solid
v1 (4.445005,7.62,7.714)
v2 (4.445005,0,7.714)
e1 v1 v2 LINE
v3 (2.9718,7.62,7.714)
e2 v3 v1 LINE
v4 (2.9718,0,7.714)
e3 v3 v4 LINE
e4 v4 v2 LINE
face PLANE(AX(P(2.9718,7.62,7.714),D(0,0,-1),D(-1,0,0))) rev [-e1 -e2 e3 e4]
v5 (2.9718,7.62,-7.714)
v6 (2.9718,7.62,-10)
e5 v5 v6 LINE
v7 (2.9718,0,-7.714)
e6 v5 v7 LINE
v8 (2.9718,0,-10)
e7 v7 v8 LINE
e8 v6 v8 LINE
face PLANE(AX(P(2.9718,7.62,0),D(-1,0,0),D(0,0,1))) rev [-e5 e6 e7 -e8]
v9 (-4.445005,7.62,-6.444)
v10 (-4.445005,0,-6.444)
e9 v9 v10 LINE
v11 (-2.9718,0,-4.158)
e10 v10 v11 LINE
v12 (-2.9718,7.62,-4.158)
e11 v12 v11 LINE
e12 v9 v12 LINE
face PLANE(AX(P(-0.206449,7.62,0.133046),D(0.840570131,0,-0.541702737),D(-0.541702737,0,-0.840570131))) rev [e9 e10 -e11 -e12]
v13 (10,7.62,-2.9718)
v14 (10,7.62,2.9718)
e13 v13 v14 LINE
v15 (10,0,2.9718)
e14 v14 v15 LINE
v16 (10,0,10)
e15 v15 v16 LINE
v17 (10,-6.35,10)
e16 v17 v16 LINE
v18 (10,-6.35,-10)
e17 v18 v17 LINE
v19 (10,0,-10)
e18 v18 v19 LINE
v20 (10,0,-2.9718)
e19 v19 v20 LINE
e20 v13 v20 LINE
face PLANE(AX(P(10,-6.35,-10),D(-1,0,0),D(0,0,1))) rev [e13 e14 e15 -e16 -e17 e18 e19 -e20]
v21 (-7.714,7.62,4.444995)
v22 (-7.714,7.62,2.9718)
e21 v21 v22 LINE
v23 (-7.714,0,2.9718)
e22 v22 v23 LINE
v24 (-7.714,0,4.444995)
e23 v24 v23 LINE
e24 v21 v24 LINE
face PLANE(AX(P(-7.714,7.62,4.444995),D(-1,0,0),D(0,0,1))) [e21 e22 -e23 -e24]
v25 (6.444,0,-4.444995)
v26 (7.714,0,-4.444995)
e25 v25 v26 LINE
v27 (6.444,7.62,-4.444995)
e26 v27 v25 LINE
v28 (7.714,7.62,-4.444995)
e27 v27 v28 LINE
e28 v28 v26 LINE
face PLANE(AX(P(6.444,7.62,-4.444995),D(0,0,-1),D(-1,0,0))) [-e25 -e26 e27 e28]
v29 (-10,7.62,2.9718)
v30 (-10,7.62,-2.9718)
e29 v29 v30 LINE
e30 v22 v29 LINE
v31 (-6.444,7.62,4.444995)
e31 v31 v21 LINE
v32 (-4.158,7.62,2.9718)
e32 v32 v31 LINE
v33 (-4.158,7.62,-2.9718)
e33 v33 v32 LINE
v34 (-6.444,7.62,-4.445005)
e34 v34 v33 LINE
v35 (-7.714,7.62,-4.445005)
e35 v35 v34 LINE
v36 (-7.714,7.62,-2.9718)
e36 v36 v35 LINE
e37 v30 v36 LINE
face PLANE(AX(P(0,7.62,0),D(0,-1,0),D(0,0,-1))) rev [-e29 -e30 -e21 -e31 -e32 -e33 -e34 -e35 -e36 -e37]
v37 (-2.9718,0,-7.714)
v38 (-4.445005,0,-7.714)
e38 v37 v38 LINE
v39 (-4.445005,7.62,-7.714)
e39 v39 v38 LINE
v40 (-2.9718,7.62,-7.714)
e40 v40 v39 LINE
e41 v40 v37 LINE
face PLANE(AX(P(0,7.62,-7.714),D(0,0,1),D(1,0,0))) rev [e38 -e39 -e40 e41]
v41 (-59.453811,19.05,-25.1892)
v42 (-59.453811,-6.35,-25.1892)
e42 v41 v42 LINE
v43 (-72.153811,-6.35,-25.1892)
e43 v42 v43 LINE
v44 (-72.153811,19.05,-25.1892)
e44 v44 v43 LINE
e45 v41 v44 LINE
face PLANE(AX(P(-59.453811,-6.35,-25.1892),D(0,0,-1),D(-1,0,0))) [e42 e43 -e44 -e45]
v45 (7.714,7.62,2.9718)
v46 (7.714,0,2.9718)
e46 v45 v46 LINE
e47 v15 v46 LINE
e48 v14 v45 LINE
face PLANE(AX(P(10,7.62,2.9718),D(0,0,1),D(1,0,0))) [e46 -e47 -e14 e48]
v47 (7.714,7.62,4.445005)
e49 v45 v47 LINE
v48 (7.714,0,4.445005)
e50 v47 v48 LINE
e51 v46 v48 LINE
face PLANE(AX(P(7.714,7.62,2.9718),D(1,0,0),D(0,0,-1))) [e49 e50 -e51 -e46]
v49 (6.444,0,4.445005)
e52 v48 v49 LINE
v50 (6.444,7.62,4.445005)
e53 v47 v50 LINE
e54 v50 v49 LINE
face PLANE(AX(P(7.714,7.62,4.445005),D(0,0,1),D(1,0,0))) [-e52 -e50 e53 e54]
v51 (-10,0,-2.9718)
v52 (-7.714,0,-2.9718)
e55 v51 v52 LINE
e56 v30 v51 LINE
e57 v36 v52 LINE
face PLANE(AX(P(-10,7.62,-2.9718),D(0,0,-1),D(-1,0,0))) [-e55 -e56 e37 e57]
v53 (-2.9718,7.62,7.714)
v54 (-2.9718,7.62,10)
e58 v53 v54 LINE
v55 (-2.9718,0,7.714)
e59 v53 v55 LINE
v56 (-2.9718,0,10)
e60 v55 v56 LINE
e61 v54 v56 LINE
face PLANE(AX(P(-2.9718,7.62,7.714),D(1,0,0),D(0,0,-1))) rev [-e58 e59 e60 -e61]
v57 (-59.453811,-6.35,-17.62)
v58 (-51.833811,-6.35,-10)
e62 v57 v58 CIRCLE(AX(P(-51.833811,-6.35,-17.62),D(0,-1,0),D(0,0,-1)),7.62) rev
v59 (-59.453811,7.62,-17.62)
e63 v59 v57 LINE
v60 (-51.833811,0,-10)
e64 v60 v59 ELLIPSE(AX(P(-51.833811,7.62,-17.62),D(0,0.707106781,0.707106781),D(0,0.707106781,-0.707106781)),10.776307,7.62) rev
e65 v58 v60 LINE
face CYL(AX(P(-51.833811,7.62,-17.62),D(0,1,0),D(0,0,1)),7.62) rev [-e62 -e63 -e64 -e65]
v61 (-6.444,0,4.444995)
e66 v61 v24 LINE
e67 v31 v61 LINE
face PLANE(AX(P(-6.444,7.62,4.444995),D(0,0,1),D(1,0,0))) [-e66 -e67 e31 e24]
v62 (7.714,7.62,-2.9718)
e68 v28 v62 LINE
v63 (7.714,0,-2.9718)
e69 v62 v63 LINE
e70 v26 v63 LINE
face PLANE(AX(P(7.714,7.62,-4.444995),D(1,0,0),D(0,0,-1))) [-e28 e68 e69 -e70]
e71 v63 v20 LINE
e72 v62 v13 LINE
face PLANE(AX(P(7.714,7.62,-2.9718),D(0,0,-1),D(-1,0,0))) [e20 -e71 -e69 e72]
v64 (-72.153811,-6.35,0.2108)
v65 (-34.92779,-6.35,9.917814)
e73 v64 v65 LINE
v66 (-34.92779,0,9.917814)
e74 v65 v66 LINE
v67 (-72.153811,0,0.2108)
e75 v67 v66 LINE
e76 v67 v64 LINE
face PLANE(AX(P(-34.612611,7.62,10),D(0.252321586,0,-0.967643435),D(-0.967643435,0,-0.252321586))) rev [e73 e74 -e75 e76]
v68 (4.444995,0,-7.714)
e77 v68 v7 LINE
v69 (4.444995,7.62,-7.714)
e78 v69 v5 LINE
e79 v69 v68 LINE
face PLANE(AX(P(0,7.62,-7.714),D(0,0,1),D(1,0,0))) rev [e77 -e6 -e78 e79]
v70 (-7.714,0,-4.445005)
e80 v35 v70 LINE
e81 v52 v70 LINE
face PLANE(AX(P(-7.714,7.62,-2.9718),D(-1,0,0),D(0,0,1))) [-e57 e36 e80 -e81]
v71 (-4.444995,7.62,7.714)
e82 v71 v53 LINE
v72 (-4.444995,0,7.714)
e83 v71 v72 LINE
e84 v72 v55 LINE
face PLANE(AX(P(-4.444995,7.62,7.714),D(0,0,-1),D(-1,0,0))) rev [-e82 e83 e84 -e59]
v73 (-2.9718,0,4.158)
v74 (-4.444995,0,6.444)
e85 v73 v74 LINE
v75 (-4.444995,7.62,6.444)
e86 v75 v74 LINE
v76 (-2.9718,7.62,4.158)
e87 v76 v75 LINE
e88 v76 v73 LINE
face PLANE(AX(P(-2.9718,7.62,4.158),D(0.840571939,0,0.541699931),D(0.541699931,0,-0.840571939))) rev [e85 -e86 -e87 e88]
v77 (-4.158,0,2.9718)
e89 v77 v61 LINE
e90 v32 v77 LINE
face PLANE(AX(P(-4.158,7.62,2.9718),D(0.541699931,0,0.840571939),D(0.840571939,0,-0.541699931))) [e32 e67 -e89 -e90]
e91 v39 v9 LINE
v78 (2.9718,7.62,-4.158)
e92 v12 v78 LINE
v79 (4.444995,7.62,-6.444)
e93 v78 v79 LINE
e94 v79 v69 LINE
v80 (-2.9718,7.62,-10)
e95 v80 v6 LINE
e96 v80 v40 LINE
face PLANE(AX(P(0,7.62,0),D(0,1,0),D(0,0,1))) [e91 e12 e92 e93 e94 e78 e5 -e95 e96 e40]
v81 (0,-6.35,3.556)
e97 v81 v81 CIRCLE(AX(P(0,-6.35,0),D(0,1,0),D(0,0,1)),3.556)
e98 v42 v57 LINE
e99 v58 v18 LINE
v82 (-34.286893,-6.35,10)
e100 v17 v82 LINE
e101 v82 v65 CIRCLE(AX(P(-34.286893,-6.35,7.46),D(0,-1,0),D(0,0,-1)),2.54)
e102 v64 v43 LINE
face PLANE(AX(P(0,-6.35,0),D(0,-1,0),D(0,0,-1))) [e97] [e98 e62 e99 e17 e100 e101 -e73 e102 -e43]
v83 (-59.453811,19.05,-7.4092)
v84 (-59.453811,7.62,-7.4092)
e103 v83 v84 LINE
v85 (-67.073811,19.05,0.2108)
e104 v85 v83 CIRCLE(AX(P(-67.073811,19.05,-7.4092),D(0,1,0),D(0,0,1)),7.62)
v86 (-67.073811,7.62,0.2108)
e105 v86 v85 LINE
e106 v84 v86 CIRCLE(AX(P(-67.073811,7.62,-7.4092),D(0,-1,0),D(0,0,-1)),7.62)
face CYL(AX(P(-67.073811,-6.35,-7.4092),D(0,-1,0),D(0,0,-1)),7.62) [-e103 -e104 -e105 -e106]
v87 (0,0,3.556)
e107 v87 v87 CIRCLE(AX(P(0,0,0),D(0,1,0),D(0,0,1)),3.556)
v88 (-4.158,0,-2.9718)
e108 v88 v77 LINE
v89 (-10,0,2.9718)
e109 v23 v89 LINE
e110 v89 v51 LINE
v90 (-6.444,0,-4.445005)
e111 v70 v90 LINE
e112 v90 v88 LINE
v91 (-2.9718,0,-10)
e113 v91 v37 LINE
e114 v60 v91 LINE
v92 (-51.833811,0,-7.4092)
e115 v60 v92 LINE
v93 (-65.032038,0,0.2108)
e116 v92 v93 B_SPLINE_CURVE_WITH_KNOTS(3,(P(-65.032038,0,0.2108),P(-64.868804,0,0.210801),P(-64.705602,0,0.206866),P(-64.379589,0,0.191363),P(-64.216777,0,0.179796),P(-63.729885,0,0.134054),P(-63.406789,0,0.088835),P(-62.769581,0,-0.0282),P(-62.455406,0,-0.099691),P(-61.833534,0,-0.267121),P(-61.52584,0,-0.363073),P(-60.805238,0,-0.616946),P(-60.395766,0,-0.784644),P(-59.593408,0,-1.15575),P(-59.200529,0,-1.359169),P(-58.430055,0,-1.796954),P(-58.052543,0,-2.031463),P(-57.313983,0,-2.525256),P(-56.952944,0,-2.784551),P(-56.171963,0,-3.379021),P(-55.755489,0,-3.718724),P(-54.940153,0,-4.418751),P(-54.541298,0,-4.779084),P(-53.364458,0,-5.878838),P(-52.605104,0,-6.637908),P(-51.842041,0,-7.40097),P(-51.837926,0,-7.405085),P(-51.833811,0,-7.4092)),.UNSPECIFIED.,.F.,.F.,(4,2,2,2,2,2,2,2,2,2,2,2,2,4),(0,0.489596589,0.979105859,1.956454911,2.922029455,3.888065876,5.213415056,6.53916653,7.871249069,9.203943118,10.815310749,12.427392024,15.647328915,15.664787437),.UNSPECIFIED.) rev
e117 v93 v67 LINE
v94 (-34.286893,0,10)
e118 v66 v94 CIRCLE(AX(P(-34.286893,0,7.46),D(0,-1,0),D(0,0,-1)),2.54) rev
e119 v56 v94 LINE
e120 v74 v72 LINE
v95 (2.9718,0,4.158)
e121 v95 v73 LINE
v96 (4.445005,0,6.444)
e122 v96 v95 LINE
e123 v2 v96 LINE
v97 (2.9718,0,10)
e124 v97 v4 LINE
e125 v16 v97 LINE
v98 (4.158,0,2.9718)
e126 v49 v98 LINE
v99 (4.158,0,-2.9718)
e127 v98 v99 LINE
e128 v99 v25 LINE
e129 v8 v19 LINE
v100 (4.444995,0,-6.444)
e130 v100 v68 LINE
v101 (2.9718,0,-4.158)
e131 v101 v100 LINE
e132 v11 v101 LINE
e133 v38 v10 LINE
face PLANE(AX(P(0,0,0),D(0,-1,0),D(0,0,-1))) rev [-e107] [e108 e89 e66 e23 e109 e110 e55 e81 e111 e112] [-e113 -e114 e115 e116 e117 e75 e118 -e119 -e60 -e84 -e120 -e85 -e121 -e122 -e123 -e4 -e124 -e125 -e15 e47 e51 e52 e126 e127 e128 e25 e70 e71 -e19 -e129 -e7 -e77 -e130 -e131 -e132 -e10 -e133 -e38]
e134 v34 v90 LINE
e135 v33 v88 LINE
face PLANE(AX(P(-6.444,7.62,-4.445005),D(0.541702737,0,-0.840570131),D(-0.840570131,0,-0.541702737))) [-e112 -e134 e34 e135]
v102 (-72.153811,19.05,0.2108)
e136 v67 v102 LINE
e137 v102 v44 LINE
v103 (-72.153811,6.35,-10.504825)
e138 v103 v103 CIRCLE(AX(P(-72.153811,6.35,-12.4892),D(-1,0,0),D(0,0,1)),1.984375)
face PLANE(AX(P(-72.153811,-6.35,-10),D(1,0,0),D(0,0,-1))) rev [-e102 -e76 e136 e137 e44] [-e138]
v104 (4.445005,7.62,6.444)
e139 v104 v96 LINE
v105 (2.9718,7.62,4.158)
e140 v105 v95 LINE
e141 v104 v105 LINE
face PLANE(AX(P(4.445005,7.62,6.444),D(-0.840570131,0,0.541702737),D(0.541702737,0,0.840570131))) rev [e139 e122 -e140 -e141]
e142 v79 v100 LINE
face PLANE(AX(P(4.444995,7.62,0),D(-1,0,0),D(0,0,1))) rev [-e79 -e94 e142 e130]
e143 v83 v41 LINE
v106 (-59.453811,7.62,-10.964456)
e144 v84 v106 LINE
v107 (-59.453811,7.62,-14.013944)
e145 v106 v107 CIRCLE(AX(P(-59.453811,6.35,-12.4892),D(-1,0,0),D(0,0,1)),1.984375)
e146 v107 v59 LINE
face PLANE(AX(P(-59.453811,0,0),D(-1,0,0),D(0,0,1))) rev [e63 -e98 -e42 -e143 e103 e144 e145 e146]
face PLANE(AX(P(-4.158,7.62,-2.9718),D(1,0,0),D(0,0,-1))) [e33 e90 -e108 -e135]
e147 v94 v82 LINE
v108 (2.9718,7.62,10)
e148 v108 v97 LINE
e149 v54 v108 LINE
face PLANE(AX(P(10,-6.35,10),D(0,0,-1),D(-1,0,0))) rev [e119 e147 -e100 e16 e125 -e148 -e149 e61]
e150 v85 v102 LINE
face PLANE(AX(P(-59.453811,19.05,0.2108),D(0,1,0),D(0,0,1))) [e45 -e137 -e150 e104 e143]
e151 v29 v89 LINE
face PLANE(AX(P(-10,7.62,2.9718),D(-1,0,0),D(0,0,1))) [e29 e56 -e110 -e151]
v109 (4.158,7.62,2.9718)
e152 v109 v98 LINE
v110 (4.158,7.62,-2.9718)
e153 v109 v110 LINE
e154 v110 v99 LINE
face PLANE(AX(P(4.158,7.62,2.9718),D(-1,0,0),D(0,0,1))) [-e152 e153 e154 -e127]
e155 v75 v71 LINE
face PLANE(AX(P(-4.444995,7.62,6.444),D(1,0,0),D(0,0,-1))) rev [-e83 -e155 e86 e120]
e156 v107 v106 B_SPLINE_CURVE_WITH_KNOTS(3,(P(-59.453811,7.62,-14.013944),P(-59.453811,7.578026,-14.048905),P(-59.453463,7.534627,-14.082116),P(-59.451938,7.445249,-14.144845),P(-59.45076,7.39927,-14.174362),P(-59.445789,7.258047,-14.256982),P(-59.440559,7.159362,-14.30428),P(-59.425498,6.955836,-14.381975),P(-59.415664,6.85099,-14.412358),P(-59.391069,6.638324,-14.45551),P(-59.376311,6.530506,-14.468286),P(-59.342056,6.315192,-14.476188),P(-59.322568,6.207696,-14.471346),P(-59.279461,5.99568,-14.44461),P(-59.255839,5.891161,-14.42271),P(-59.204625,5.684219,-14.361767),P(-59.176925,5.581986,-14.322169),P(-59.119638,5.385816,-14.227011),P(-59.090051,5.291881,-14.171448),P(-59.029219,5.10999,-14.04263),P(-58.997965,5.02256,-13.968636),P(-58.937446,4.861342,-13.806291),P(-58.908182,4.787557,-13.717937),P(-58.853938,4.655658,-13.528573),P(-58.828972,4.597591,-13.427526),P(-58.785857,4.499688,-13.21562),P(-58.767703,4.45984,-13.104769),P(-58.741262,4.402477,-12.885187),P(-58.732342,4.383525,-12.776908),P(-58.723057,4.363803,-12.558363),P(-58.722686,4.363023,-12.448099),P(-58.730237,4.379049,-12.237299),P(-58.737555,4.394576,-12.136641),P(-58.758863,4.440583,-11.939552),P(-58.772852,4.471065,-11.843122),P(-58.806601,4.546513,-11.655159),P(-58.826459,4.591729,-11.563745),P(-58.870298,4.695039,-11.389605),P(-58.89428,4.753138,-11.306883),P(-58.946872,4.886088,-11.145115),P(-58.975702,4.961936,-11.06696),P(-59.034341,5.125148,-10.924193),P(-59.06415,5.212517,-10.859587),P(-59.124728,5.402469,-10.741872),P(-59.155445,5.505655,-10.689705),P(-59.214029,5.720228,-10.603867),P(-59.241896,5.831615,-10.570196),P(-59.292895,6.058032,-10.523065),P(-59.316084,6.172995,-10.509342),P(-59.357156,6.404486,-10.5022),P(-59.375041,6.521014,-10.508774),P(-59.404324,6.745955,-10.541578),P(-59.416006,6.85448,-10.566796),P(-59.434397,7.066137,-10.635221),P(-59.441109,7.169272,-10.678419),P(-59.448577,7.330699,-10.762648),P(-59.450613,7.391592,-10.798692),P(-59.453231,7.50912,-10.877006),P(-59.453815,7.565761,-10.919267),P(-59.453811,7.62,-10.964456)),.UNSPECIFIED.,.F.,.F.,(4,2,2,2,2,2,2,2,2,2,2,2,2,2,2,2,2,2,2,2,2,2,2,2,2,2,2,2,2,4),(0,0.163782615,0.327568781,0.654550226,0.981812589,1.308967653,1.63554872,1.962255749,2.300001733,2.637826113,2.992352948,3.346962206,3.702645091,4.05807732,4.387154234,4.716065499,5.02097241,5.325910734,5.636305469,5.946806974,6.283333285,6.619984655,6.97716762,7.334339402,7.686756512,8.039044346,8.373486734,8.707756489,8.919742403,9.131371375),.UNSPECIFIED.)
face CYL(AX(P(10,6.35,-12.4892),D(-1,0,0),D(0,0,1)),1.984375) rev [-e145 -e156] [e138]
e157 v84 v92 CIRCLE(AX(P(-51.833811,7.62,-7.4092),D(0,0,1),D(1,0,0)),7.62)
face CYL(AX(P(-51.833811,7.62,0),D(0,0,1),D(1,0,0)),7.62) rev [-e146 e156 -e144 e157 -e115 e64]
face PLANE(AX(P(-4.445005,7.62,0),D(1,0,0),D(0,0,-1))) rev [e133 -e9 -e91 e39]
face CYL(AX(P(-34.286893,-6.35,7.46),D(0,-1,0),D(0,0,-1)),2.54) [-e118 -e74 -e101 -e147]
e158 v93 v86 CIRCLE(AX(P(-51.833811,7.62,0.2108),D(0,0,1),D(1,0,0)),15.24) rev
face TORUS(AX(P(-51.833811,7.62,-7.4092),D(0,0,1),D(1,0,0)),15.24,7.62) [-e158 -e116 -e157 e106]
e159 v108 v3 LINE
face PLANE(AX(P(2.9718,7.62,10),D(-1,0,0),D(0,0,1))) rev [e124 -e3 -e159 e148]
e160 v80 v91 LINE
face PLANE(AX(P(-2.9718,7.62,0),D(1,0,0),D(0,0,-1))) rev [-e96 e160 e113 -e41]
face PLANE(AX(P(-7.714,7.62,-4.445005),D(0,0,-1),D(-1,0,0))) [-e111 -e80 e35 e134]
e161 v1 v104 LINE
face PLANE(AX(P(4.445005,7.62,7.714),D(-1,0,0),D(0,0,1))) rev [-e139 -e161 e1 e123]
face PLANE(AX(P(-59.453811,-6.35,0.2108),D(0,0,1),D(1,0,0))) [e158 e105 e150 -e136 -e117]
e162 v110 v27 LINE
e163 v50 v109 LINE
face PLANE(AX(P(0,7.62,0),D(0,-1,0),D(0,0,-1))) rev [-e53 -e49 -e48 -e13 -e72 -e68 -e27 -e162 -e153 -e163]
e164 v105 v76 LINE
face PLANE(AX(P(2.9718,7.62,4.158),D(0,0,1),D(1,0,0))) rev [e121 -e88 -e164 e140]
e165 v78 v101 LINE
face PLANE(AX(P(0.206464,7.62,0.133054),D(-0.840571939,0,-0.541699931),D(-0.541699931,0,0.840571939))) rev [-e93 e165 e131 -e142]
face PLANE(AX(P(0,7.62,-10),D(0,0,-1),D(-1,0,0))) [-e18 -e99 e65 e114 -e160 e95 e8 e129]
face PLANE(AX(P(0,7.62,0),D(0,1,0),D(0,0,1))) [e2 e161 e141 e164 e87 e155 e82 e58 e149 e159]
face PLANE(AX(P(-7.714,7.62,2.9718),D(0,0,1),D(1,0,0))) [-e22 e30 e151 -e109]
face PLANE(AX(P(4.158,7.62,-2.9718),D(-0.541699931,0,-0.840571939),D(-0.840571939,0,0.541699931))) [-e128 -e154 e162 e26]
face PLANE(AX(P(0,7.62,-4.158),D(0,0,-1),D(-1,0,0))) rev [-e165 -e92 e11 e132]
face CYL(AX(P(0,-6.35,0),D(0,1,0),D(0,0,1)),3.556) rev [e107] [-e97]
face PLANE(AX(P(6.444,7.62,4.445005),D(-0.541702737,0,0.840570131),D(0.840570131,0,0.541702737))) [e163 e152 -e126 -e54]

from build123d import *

# Parameters (mm, degrees)
BOSS_EXTRUDE1_DEPTH   = 7.62
BOSS_EXTRUDE1_2_DEPTH = 7.62
BOSS_EXTRUDE1_3_DEPTH = 7.62
BOSS_EXTRUDE1_4_DEPTH = 7.62
SKETCH2_W             = 82.1538108
SKETCH2_H             = 20
BOSS_EXTRUDE2_DEPTH   = 6.35
CUT_EXTRUDE1_DEPTH    = 75.17097352
FILLET1_R             = 2.54
SKETCH6_W             = 25.4
SKETCH6_H             = 25.4
BOSS_EXTRUDE7_DEPTH   = 12.7
FILLET3_R             = 7.62
FILLET5_R             = 7.62
SKETCH11_R            = 1.984375
CUT_EXTRUDE3_DEPTH    = 89.015038158
SKETCH12_R            = 3.556
CUT_EXTRUDE4_DEPTH    = 79.762749597


with BuildPart() as part:
    # Sketch1 → Boss-Extrude1 (new body)
    with BuildSketch(Plane(origin=(0, 0, 0), x_dir=(1, 0, 0), z_dir=(0, 1, 0))):
        Polygon((-2.9718, 10), (-2.9718, 7.714), (-4.4450054, 7.714), (-4.4450054, 6.444), (-2.9718, 4.158), (2.9718, 4.158), (4.4449946, 6.444), (4.4449946, 7.714), (2.9718, 7.714), (2.9718, 10), align=None)
    extrude(amount=BOSS_EXTRUDE1_DEPTH)



with BuildPart() as body_2:
    # Sketch1 → Boss-Extrude1 2 (new body)
    with BuildSketch(Plane(origin=(0, 0, 0), x_dir=(1, 0, 0), z_dir=(0, 1, 0))):
        Polygon((4.158, -2.9718), (4.158, 2.9718), (6.444, 4.4449946), (7.714, 4.4449946), (7.714, 2.9718), (10, 2.9718), (10, -2.9718), (7.714, -2.9718), (7.714, -4.4450054), (6.444, -4.4450054), align=None)
    extrude(amount=BOSS_EXTRUDE1_2_DEPTH)


with BuildPart() as body_3:
    # Sketch1 → Boss-Extrude1 3 (new body)
    with BuildSketch(Plane(origin=(0, 0, 0), x_dir=(1, 0, 0), z_dir=(0, 1, 0))):
        Polygon((4.4450054, -6.444), (2.9718, -4.158), (-2.9718, -4.158), (-4.4449946, -6.444), (-4.4449946, -7.714), (-2.9718, -7.714), (-2.9718, -10), (2.9718, -10), (2.9718, -7.714), (4.4450054, -7.714), align=None)
    extrude(amount=BOSS_EXTRUDE1_3_DEPTH)


with BuildPart() as body_4:
    # Sketch1 → Boss-Extrude1 4 (new body)
    with BuildSketch(Plane(origin=(0, 0, 0), x_dir=(1, 0, 0), z_dir=(0, 1, 0))):
        Polygon((-10, -2.9718), (-10, 2.9718), (-7.714, 2.9718), (-7.714, 4.4450054), (-6.444, 4.4450054), (-4.158, 2.9718), (-4.158, -2.9718), (-6.444, -4.4449946), (-7.714, -4.4449946), (-7.714, -2.9718), align=None)
    extrude(amount=BOSS_EXTRUDE1_4_DEPTH)


with BuildPart() as part_1:
    add(part.part)

    add(body_2.part)  # Boss-Extrude2 merges body 2

    add(body_3.part)  # Boss-Extrude2 merges body 3

    add(body_4.part)  # Boss-Extrude2 merges body 4
    # Sketch2 → Boss-Extrude2 (add)
    with BuildSketch(Plane.XZ):
        with Locations((-31.0769054, 0)):
            Rectangle(SKETCH2_W, SKETCH2_H)
    extrude(amount=BOSS_EXTRUDE2_DEPTH)

    # Sketch4 → Cut-Extrude1 (cut, through all)
    with BuildSketch(Plane(origin=(0, -6.35, 0), x_dir=(-1, 0, 0), z_dir=(0, -1, 0))):
        Polygon((72.1538108, -10), (34.6126108, -10), (72.1538108, -0.2108), align=None)
    extrude(amount=-CUT_EXTRUDE1_DEPTH, mode=Mode.SUBTRACT)

    # Fillet1
    fillet1_edges = [part_1.edges().sort_by_distance(p)[0] for p in [
        (-34.6126108, -3.175, 10),
    ]]
    fillet(fillet1_edges, radius=FILLET1_R)

    # Sketch6 → Boss-Extrude7 (add)
    with BuildSketch(Plane.ZY.offset(72.1538108)):
        with Locations((-12.4892, 6.35)):
            Rectangle(SKETCH6_W, SKETCH6_H)
    extrude(amount=-BOSS_EXTRUDE7_DEPTH)

    # Fillet3
    fillet3_edges = [part_1.edges().sort_by_distance(p)[0] for p in [
        (-59.4538108, 0, -4.8946),
        (-59.4538108, -3.175, -10),
    ]]
    fillet(fillet3_edges, radius=FILLET3_R)

    # Fillet5
    # the kernel refuses this fillet: 7.62 mm, written as the material it takes off along each edge
    with BuildSketch(Plane(origin=(-59.4538108, 38.1, 0.2108), x_dir=(-1, 0, 0), z_dir=(0, -1, 0))) as fillet5_piece_1:
        with BuildLine():
            CenterArc((FILLET5_R, FILLET5_R), FILLET5_R, 180, 90)
            Line((0, FILLET5_R), (0, 0))
            Line((0, 0), (FILLET5_R, 0))
        make_face()
    extrude(amount=30.48, mode=Mode.SUBTRACT)
    with BuildSketch(Plane(origin=(-51.8338108, 7.62, 0.2108), x_dir=(0.5976672776328273, 0.8017442392976484, 0), z_dir=(-0.8017442392976484, 0.5976672776328273, 0))) as fillet5_piece_2_section:
        with BuildLine():
            CenterArc((7.62 + FILLET5_R, FILLET5_R), FILLET5_R, 180, 90)
            Line((7.62, FILLET5_R), (7.62, 0))
            Line((7.62, 0), (7.62 + FILLET5_R, 0))
        make_face()
    fillet5_piece_2 = revolve(axis=Axis((-51.8338108, 7.62, 0.2108), (0, 0, -1)), revolution_arc=233.296989237, mode=Mode.PRIVATE)
    fillet5_piece_2 = split(fillet5_piece_2, bisect_by=Plane(origin=(-57.548345525, 0, -2.163807672), z_dir=(0, 1, 0)), keep=Keep.TOP, mode=Mode.PRIVATE)
    add(fillet5_piece_2, mode=Mode.SUBTRACT)

    # Sketch11 → Cut-Extrude3 (cut, through all)
    with BuildSketch(Plane.ZY.offset(72.1538108)):
        with Locations((-12.4892, 6.35)):
            Circle(SKETCH11_R)
    extrude(amount=-CUT_EXTRUDE3_DEPTH, mode=Mode.SUBTRACT)

    # Sketch12 → Cut-Extrude4 (cut, through all)
    with BuildSketch(Plane(origin=(0, 0, 0), x_dir=(1, 0, 0), z_dir=(0, 1, 0))):
        with Locations(Location((0, 0, 0), (0, 0, 270))):
            Circle(SKETCH12_R)
    extrude(amount=-CUT_EXTRUDE4_DEPTH, mode=Mode.SUBTRACT)


solid = part_1.part
